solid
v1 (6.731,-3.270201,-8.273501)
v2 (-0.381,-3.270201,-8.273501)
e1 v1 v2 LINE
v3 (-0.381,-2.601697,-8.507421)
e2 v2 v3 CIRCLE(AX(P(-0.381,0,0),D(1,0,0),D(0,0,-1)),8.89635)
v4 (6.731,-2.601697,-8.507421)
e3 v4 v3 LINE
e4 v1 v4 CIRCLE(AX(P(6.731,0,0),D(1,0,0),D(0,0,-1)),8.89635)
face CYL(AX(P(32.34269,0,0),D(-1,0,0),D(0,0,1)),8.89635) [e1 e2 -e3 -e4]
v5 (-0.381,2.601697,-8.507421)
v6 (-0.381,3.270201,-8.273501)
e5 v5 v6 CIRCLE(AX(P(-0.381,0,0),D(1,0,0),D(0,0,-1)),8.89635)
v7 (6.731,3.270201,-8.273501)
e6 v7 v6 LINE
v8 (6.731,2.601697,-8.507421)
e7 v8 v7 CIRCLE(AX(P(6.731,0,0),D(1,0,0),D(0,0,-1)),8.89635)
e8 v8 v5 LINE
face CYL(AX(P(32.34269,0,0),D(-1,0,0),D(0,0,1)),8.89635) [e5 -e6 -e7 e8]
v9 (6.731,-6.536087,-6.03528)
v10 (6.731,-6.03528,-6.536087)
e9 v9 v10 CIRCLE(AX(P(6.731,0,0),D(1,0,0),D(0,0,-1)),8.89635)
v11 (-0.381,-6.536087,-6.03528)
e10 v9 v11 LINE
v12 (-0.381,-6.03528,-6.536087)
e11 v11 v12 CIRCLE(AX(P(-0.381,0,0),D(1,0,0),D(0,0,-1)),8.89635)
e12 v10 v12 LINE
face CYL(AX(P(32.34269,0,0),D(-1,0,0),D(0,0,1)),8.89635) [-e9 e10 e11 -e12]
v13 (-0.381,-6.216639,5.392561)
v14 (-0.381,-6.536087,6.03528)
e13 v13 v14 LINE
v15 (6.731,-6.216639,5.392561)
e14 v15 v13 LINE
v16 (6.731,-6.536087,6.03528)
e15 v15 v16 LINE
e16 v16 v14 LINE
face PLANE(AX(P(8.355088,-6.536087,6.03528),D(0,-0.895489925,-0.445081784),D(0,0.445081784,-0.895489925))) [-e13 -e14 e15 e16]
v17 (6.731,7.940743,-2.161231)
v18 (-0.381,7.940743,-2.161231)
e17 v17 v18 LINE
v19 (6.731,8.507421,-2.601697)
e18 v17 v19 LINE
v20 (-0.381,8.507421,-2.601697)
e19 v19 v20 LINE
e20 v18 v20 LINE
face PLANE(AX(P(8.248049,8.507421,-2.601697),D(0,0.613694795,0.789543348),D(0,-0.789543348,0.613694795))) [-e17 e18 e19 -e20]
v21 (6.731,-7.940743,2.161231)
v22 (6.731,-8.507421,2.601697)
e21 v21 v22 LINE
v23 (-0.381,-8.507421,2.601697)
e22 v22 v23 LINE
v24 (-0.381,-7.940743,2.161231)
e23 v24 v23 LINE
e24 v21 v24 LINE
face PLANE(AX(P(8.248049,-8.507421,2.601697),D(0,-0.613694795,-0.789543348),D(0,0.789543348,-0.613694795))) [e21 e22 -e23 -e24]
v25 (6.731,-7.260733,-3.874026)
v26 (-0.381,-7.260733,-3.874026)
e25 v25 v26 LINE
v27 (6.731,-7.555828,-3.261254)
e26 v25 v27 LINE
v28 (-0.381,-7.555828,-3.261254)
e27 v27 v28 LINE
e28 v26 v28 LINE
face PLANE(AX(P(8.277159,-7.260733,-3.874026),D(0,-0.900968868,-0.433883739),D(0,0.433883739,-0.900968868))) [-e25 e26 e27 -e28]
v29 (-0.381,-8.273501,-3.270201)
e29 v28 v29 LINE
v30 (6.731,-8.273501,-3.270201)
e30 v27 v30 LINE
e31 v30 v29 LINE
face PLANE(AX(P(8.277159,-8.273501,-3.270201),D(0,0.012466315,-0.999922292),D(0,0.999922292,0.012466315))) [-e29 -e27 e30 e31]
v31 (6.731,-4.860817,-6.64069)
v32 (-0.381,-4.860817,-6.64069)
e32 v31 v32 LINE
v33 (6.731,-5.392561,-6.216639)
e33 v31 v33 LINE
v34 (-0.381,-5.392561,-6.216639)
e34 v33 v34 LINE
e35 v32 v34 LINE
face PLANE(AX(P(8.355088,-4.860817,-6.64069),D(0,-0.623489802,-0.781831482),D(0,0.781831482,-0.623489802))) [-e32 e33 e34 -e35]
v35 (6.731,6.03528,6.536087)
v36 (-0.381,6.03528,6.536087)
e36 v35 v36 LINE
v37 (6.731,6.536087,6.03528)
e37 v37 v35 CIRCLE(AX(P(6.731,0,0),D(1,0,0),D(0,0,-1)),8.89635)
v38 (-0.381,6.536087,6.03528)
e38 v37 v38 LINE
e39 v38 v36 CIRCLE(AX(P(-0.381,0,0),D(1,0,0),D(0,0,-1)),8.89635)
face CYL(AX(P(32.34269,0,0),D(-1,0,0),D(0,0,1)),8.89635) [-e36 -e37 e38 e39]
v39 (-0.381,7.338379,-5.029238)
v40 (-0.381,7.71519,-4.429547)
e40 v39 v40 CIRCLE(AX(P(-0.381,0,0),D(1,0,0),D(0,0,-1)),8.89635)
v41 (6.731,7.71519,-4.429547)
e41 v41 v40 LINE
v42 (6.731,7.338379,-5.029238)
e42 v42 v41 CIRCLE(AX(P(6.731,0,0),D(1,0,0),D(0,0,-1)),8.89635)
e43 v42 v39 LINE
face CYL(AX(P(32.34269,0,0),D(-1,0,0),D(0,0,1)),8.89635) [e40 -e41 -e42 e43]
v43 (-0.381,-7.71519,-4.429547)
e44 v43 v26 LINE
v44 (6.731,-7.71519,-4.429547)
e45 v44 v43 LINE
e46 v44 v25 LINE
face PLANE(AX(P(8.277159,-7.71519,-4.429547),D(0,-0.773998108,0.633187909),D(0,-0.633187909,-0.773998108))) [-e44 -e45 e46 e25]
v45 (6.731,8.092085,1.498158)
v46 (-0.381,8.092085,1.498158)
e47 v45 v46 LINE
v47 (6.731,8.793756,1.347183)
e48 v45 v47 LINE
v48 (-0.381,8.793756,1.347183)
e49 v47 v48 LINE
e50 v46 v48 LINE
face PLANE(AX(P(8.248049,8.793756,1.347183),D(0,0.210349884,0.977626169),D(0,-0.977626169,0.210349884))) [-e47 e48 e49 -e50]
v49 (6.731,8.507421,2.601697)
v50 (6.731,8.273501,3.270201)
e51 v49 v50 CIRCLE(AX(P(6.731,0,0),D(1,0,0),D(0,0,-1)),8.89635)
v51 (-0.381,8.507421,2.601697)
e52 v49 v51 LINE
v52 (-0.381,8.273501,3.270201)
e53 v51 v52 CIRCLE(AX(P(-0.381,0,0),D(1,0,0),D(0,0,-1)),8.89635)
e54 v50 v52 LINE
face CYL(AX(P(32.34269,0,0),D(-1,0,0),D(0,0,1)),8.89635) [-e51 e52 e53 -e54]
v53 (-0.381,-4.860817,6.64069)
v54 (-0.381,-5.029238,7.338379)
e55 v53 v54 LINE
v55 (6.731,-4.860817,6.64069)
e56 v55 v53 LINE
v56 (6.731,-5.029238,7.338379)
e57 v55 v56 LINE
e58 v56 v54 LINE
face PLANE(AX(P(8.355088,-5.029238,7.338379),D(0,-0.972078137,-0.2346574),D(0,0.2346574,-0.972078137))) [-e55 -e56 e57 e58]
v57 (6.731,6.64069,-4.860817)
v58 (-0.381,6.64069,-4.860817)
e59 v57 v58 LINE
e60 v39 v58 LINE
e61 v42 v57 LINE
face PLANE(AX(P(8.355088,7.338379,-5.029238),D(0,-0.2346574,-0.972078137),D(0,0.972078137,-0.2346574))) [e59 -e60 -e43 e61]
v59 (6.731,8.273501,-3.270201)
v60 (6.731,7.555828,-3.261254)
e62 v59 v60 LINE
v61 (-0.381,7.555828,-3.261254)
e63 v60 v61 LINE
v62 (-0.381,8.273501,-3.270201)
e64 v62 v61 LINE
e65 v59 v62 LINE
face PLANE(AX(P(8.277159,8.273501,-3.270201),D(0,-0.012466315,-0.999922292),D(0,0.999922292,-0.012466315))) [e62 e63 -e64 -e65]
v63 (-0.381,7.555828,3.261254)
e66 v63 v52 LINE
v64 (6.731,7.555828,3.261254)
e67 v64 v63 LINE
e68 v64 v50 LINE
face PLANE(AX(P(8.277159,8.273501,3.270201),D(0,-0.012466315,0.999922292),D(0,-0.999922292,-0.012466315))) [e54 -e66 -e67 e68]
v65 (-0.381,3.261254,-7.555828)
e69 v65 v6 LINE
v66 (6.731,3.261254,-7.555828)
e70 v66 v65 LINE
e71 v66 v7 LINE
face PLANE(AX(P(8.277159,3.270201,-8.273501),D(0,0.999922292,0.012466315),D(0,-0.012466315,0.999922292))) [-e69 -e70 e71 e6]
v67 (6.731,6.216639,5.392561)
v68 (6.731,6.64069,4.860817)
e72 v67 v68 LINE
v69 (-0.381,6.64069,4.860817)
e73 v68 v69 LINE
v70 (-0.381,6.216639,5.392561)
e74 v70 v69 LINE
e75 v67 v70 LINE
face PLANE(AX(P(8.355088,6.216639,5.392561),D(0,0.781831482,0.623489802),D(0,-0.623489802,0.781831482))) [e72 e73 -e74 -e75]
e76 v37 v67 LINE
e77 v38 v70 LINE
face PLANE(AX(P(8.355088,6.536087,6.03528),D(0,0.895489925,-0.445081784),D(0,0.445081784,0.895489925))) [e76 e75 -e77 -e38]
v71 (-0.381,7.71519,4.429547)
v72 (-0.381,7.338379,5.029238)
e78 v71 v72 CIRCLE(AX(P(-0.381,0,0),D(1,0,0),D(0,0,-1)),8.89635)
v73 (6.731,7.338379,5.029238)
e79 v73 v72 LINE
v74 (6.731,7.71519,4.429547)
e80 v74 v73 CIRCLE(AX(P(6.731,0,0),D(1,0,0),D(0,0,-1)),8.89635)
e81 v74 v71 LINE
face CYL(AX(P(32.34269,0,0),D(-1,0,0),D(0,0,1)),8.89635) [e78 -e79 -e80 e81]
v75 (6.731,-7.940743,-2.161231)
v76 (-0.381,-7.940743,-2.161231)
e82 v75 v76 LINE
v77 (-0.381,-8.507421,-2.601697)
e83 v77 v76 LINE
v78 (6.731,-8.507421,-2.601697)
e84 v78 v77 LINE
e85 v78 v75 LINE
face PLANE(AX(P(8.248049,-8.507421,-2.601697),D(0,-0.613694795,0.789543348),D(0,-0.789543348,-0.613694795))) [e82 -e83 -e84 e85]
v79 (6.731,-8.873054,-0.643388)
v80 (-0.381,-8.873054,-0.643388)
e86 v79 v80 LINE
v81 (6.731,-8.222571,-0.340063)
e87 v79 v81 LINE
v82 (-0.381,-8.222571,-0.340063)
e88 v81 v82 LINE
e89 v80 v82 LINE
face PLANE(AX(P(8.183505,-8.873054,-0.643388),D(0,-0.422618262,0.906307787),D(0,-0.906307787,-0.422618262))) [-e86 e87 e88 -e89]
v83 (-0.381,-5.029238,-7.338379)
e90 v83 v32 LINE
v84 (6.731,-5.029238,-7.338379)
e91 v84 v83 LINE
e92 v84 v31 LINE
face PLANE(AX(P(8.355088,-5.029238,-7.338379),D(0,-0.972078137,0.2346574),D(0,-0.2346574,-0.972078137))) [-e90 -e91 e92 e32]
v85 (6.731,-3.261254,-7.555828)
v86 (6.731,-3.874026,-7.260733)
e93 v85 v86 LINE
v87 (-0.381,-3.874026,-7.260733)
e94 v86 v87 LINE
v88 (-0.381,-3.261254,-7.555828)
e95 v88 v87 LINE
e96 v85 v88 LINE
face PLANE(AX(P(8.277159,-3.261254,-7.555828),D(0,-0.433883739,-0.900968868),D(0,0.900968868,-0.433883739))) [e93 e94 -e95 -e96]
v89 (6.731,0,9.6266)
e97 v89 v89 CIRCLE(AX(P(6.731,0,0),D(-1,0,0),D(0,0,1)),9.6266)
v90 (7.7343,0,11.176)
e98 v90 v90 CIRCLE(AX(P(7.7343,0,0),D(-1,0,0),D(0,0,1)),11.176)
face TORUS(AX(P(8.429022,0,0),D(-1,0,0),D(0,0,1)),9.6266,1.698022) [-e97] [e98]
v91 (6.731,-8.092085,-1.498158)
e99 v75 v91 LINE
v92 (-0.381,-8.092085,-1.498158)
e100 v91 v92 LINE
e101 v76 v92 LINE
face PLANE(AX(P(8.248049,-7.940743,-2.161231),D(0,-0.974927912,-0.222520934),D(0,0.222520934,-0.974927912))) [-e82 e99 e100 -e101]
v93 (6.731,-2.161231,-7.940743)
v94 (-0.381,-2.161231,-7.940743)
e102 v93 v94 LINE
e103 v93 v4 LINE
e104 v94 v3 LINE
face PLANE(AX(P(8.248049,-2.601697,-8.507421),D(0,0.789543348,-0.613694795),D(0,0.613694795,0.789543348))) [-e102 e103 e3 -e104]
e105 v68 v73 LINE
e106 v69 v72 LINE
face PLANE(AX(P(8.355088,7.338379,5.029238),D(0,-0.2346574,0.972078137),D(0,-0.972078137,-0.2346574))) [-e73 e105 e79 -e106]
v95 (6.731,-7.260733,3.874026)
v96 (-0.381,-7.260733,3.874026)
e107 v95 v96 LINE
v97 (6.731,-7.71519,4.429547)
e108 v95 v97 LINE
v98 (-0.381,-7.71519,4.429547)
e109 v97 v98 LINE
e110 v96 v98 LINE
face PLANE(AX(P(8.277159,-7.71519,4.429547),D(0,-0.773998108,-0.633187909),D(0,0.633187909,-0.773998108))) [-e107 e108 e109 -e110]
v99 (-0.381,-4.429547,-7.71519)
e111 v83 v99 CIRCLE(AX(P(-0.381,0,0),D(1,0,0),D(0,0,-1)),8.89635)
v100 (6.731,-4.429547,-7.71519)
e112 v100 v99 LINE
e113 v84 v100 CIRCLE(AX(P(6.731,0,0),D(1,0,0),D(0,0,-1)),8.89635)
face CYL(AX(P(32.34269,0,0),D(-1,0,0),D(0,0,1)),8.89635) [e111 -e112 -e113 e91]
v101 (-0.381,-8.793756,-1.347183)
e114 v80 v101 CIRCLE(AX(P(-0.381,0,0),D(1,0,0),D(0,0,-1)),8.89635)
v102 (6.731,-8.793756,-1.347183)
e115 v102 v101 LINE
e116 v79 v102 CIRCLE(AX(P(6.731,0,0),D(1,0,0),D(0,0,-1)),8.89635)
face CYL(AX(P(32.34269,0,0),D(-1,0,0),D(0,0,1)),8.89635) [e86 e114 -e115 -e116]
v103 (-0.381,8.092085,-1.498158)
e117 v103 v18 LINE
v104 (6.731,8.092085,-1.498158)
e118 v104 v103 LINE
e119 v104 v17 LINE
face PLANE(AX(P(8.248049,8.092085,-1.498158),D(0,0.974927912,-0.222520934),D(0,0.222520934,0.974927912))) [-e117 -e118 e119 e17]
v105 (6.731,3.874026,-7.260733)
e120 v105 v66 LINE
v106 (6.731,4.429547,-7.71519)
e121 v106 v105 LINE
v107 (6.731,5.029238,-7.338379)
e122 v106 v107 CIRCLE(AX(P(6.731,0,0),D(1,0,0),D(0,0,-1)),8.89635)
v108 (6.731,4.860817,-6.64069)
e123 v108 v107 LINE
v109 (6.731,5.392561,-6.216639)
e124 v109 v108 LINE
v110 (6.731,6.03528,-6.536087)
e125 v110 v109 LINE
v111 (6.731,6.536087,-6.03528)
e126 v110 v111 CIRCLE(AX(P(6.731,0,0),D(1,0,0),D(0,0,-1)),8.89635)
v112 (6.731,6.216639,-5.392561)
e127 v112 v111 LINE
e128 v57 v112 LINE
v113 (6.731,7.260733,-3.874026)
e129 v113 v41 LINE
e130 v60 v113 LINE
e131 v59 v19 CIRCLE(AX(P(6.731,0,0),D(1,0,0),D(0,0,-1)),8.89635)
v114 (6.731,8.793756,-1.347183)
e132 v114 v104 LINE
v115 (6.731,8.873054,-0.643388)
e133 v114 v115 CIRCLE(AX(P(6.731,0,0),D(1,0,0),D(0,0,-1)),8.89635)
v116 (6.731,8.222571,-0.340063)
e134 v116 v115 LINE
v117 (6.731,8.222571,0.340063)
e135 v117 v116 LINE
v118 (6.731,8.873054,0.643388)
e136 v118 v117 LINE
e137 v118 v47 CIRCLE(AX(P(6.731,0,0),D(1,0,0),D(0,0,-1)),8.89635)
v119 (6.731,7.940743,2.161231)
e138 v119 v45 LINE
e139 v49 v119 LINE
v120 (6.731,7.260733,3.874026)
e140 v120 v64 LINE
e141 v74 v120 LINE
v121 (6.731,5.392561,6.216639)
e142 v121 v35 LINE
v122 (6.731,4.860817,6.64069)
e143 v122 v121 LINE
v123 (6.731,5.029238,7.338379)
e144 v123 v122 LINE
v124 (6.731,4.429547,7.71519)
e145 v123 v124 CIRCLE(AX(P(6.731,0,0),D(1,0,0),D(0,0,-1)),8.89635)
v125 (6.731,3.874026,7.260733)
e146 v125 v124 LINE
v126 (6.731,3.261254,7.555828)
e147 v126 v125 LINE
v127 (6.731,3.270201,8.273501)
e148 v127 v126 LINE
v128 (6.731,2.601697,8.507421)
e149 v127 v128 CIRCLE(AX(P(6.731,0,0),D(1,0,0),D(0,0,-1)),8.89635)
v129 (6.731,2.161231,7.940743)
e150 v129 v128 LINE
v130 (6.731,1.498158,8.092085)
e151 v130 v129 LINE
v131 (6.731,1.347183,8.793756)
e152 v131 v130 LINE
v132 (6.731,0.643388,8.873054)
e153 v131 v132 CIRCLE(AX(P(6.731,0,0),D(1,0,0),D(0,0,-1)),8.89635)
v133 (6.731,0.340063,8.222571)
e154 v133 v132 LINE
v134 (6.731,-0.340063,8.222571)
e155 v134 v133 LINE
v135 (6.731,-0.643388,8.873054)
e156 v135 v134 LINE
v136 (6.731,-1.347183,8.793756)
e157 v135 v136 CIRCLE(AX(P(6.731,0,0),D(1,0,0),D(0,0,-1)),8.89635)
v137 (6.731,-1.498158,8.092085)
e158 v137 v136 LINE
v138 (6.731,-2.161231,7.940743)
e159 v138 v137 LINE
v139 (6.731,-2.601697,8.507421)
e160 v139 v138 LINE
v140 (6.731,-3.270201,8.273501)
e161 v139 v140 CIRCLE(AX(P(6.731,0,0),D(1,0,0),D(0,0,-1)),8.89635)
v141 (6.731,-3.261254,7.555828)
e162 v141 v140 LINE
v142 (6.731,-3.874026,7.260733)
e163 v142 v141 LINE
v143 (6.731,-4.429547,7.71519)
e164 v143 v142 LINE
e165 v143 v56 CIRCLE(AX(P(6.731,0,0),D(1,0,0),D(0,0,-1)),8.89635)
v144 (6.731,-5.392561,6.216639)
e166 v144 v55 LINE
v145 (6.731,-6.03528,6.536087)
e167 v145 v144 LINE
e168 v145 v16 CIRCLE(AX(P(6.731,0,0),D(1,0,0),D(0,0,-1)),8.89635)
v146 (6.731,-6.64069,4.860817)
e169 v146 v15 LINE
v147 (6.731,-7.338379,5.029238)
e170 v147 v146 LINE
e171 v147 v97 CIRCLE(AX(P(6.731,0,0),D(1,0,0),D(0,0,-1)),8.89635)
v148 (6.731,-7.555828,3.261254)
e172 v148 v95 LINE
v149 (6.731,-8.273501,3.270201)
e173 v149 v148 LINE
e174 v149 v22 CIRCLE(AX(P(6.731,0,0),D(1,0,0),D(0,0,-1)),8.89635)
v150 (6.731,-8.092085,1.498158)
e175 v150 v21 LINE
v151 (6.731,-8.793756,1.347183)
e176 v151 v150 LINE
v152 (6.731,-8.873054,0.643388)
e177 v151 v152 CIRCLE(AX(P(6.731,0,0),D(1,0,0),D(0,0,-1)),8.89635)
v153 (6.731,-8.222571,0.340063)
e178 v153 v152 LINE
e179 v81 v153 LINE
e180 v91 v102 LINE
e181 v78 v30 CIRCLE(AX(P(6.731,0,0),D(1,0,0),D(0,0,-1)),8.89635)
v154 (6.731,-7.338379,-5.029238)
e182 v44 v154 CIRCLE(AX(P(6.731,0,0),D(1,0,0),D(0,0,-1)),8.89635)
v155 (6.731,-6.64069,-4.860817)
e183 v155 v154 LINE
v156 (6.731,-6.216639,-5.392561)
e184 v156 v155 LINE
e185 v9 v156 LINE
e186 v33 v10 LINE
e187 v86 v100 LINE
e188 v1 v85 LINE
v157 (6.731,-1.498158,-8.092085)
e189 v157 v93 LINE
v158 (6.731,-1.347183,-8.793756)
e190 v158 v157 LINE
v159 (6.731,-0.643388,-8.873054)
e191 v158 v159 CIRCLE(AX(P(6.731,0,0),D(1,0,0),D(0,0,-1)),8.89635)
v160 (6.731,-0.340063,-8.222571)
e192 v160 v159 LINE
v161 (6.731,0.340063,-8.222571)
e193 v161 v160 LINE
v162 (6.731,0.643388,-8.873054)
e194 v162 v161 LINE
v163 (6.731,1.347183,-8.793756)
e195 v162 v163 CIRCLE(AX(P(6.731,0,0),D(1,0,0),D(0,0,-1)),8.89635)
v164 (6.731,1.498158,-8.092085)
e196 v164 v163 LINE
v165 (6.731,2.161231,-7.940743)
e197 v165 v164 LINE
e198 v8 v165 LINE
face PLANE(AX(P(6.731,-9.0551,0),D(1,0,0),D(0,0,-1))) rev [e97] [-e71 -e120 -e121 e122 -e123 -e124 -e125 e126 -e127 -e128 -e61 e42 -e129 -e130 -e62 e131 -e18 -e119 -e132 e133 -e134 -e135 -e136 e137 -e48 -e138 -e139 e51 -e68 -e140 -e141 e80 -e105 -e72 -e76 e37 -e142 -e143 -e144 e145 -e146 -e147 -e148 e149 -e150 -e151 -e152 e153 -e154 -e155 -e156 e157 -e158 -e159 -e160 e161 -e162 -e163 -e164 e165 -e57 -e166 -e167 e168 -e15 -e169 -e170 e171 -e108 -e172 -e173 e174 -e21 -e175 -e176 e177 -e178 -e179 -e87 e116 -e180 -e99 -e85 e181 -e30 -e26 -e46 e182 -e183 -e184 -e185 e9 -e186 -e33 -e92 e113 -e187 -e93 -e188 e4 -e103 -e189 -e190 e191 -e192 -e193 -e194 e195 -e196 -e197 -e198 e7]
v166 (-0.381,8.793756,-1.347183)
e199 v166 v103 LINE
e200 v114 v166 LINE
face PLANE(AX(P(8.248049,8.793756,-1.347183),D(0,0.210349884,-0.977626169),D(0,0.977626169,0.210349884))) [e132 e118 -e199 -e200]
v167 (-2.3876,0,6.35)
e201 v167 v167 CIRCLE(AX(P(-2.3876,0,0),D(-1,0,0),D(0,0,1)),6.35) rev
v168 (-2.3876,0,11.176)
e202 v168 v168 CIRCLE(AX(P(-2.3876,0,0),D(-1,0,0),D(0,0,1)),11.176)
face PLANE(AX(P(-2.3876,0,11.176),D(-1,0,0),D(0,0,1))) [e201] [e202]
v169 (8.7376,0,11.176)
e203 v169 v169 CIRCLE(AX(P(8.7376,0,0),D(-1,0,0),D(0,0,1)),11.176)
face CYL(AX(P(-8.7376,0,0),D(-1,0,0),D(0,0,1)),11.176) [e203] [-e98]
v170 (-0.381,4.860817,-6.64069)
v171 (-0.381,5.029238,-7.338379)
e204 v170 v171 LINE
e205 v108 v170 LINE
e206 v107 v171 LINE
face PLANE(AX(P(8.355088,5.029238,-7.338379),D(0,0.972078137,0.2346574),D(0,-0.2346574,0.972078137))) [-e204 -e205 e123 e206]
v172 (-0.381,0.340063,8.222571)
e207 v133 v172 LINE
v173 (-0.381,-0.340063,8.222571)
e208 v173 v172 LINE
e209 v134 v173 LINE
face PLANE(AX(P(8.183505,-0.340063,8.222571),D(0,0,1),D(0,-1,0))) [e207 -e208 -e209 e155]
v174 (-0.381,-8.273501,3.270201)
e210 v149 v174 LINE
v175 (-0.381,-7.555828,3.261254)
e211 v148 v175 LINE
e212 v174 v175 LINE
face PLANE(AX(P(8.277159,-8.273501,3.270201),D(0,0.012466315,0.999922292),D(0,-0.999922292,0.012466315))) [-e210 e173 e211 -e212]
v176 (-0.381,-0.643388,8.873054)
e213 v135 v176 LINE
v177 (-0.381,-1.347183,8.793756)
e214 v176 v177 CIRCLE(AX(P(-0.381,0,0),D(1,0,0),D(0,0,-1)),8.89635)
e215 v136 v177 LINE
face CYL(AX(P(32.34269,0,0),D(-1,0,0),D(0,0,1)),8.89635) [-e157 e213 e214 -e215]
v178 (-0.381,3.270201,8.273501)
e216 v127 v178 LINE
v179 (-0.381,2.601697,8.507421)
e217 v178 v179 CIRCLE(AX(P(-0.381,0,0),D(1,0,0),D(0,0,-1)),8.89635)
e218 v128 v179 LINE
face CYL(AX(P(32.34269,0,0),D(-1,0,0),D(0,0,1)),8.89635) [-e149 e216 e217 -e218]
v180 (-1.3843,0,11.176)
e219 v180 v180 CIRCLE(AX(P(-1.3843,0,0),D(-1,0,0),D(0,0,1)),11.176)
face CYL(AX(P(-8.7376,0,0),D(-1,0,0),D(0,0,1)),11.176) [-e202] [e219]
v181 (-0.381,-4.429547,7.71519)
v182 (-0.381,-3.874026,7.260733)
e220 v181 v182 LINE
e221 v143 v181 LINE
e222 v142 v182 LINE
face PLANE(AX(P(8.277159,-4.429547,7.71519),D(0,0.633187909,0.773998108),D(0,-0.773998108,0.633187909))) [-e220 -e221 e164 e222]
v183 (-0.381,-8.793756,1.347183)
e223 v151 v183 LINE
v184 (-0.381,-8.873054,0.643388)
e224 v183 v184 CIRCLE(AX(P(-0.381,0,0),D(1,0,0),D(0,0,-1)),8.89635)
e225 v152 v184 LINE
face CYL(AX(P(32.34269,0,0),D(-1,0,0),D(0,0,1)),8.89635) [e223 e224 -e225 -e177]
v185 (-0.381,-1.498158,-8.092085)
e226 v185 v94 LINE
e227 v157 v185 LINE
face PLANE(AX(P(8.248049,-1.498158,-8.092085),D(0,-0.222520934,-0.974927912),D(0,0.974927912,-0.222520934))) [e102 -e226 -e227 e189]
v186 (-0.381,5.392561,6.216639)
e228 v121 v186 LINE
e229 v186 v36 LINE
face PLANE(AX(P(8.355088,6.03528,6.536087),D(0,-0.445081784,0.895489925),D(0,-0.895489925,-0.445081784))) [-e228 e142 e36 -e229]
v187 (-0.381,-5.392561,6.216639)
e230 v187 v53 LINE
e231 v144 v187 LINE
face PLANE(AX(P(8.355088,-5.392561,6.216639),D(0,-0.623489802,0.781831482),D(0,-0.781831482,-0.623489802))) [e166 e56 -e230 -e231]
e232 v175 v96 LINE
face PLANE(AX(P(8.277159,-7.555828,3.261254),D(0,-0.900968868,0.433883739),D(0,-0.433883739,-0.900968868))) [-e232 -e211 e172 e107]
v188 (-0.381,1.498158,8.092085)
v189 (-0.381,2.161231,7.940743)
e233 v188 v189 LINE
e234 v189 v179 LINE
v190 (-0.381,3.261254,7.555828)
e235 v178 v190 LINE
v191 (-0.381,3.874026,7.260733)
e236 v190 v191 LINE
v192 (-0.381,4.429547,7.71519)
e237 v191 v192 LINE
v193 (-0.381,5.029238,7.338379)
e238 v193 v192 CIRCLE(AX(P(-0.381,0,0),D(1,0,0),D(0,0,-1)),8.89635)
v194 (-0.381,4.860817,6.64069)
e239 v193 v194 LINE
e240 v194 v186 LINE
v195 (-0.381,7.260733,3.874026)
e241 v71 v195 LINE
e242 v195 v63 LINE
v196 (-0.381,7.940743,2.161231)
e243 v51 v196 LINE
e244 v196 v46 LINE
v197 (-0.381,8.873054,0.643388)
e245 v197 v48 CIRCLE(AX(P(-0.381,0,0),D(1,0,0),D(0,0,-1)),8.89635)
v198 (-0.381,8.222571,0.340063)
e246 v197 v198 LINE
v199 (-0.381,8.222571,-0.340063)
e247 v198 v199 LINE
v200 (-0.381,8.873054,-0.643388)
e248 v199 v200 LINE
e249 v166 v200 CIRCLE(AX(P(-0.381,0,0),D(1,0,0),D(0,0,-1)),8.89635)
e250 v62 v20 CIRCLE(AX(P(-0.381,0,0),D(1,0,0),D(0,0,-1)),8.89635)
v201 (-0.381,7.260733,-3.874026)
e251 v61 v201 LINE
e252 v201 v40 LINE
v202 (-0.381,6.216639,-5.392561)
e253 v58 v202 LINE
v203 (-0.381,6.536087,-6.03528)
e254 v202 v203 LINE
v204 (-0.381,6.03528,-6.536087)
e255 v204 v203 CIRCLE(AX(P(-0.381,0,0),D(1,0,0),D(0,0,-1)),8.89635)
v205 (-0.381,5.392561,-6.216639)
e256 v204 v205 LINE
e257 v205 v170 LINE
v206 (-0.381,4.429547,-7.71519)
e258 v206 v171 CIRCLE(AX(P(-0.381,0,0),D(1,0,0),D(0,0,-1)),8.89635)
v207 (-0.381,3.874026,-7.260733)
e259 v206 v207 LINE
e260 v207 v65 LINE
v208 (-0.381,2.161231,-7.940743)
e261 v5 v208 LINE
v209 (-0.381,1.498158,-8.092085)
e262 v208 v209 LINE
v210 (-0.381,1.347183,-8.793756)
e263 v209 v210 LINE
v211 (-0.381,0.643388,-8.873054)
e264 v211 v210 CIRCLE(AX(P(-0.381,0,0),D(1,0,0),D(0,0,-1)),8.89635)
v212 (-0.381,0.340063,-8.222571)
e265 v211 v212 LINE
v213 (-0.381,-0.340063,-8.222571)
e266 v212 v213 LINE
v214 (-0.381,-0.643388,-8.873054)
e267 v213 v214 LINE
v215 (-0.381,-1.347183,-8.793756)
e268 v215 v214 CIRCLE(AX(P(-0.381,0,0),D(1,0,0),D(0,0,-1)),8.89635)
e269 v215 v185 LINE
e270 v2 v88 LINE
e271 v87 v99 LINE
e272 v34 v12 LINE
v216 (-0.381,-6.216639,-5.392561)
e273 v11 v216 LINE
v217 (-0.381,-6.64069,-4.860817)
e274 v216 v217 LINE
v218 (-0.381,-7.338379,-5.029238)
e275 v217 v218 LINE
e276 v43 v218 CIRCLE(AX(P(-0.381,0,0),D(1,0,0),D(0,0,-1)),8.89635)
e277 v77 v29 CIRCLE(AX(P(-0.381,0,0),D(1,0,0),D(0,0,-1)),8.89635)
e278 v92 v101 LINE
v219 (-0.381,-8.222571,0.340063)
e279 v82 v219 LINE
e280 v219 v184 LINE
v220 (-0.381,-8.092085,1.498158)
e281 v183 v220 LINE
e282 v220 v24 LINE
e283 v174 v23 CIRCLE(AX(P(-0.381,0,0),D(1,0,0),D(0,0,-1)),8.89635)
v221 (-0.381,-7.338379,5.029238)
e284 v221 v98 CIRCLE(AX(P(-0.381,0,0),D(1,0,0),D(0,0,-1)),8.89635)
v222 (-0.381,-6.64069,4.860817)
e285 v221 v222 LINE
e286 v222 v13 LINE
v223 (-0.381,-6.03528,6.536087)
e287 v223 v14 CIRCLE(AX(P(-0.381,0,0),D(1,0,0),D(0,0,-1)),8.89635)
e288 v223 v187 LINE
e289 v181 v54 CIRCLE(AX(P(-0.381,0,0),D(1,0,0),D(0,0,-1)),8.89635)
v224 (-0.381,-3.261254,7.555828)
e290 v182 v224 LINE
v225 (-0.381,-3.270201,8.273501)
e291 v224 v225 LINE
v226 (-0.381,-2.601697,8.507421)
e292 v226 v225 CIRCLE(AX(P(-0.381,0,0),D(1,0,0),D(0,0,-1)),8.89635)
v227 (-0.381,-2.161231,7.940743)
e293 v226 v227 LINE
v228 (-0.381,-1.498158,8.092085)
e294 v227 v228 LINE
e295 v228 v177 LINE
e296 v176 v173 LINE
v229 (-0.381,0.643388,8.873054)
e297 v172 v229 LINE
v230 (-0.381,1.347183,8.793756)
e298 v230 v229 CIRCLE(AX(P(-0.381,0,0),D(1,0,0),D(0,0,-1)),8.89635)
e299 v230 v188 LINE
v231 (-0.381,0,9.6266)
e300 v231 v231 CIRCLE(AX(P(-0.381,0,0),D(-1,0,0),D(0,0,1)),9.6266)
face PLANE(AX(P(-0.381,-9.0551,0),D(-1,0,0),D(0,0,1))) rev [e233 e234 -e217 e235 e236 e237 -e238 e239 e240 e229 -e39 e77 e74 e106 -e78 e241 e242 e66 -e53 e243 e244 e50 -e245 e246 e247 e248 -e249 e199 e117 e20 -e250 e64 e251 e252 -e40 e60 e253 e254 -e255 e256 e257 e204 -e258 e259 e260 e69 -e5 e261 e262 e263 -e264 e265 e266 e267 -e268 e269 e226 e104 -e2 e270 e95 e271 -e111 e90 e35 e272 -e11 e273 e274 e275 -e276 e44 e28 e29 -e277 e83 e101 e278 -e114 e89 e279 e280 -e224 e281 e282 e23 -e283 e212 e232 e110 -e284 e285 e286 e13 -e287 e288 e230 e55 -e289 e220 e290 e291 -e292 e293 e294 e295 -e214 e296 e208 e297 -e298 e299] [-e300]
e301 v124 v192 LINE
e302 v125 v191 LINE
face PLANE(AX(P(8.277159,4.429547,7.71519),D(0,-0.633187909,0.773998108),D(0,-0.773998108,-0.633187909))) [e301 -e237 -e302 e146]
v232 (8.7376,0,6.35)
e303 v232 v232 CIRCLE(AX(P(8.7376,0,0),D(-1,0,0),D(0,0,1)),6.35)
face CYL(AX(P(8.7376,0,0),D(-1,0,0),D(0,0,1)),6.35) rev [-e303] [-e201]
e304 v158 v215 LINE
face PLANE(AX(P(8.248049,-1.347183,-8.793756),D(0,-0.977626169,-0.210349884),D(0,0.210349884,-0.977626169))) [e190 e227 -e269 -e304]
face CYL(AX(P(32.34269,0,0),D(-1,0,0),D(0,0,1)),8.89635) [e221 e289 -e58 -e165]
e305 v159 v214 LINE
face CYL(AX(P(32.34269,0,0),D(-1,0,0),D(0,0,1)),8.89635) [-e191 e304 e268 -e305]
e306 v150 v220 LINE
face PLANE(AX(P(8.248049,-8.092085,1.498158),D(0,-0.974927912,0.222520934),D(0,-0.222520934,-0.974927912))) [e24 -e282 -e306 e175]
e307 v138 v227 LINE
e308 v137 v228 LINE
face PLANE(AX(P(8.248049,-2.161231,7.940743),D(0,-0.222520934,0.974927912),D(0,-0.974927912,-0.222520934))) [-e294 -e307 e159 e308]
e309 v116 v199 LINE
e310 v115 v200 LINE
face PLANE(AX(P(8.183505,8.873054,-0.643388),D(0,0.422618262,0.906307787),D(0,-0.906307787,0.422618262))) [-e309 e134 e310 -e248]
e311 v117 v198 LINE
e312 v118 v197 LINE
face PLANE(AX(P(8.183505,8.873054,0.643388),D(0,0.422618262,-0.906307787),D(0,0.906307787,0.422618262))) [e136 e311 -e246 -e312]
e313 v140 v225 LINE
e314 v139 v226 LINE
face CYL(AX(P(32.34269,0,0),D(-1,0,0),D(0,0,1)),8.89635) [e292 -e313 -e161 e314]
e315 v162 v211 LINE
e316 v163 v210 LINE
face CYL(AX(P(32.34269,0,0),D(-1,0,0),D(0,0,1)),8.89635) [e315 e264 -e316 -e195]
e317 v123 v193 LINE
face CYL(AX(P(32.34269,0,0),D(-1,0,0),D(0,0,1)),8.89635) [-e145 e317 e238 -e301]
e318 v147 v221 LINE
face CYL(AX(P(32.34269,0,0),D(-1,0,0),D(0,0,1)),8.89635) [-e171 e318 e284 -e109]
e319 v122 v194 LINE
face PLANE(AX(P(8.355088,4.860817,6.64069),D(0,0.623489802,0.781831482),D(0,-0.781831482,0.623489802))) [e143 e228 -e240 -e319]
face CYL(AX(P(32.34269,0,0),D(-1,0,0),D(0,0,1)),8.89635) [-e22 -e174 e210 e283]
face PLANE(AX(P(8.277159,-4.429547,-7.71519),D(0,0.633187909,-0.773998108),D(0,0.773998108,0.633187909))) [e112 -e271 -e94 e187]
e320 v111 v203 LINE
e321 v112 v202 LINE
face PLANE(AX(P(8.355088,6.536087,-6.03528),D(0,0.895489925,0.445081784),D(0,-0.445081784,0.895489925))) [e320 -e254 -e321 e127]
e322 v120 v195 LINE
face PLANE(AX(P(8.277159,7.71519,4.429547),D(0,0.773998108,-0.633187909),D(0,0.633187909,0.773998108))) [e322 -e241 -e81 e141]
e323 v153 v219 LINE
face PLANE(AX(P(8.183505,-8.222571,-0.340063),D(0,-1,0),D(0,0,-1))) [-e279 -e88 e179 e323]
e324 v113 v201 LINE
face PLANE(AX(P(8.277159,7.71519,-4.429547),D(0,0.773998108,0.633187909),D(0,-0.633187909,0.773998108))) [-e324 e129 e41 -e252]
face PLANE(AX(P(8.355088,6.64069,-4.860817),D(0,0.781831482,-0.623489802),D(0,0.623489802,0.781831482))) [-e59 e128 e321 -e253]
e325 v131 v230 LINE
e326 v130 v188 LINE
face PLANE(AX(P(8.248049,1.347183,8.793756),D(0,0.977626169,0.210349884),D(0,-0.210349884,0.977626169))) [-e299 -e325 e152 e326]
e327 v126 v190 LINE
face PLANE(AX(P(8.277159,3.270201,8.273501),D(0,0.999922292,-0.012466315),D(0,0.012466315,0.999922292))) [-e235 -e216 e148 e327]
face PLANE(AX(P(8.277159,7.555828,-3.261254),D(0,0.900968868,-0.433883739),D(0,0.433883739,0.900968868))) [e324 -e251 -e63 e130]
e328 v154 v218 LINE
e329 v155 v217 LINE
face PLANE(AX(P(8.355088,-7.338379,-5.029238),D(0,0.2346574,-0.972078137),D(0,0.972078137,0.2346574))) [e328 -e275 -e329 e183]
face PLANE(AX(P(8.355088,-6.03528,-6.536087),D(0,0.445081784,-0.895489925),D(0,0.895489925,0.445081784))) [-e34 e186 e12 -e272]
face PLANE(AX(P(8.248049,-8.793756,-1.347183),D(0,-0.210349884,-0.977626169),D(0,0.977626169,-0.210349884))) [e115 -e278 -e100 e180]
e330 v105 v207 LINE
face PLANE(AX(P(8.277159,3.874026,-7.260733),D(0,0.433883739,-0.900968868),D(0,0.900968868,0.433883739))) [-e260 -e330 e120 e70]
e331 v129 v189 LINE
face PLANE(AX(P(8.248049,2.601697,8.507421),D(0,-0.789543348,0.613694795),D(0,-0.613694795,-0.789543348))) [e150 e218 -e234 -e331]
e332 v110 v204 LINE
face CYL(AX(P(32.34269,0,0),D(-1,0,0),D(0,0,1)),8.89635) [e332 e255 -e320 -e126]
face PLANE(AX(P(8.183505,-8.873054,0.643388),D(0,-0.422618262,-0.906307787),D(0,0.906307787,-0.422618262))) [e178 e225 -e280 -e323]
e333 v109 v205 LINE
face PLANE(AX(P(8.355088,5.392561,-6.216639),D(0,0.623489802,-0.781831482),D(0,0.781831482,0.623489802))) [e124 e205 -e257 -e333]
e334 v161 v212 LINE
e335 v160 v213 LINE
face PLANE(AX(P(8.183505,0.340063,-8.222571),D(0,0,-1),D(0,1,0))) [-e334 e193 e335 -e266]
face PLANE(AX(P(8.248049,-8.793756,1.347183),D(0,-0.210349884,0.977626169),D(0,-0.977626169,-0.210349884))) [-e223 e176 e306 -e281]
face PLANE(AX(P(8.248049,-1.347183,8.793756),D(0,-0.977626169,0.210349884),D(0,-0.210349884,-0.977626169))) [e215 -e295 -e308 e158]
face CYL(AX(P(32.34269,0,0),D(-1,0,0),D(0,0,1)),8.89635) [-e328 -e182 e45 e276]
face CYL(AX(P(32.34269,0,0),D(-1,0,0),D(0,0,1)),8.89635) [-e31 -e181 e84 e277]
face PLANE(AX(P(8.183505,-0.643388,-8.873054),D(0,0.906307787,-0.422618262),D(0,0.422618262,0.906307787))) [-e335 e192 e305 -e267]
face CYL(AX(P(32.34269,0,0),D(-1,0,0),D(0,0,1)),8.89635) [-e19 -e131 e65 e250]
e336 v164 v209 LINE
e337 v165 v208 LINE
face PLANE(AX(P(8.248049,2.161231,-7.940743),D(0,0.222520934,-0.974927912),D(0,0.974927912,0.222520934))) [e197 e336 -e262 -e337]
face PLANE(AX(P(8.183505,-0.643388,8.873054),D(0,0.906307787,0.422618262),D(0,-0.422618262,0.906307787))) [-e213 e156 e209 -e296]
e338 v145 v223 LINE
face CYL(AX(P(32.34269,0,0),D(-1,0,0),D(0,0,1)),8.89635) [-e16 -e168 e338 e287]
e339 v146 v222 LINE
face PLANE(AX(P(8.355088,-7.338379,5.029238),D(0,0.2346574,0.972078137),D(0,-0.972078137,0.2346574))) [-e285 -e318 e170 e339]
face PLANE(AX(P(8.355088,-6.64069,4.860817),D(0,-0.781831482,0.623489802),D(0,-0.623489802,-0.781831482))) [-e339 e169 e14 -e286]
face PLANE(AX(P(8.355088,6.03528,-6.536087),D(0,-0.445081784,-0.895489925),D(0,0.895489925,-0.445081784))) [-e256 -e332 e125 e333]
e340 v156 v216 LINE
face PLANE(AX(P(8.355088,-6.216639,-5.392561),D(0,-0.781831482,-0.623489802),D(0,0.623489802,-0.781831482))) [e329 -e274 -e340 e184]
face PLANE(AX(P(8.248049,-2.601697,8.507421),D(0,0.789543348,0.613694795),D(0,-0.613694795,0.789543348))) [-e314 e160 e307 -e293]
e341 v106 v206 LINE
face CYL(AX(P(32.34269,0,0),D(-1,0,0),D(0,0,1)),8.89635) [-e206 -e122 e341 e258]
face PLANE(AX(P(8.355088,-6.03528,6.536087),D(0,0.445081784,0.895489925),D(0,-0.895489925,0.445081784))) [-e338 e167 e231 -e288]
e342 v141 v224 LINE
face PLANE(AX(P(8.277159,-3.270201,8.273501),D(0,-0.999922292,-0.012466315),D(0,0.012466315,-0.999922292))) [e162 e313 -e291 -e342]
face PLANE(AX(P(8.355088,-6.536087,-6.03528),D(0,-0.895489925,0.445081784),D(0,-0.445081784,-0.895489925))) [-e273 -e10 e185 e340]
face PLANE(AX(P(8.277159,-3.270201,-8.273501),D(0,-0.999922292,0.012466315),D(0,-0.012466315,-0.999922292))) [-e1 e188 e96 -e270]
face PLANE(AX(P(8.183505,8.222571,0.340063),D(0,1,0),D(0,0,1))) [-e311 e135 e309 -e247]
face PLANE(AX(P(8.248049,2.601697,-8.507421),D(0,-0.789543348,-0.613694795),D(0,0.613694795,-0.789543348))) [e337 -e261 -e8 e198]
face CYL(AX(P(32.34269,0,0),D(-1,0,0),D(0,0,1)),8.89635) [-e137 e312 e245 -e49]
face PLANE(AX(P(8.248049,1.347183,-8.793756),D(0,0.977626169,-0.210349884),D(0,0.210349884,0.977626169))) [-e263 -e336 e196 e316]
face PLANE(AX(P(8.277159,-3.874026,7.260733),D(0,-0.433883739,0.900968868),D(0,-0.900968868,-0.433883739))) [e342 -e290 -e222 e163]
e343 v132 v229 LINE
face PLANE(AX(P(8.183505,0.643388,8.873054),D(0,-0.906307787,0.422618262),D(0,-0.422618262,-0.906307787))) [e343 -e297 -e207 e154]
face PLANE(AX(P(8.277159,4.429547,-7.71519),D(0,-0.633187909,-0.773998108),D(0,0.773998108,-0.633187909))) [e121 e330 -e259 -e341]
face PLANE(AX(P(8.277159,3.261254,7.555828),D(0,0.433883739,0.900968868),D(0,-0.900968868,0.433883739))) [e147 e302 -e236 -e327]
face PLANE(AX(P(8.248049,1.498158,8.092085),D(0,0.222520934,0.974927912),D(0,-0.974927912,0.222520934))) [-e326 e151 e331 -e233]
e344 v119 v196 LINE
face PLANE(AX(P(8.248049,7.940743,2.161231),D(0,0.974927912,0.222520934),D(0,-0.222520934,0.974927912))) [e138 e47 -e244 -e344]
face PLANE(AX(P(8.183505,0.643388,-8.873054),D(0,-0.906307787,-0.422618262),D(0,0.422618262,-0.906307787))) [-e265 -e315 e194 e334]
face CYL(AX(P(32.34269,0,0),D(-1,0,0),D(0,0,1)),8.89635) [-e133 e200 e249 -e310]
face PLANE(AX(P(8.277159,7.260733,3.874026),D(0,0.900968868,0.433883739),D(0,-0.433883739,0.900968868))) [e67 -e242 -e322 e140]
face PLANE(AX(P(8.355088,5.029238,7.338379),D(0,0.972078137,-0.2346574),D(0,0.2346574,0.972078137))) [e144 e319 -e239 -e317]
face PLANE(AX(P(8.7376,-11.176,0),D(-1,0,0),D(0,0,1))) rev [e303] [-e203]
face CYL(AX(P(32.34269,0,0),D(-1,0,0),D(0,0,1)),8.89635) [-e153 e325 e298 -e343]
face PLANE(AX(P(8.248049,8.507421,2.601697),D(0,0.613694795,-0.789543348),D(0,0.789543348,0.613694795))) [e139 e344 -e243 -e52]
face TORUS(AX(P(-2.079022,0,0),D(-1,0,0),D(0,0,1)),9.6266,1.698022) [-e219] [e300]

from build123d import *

# Parameters (mm, degrees)
SKETCH4_R          = 9.0551
SKETCH4_R_2        = 8.89635
CUT_EXTRUDE2_DEPTH = 7.112
CUT_EXTRUDE1_DEPTH = 7.112
CIRPATTERN1_COUNT  = 28
SKETCH6_R          = 6.35
CUT_EXTRUDE3_DEPTH = 24.562439751
SPLIT1_START       = -8.7376
SPLIT1_OUTLINE_R   = 8.7376
SPLIT1_OUTLINE_R_2 = 6.35
SPLIT1_DEPTH       = 6.35


# Read off the part's stored shape, not the designer's step: Split1
with BuildPart() as part:
    # Sketch1 → Revolve1 (revolve)
    with BuildSketch(Plane.XY, mode=Mode.PRIVATE) as revolve1_sk:
        with BuildLine():
            Line((-8.7376, 3.175), (8.7376, 3.175))
            Line((8.7376, 3.175), (8.7376, 11.176))
            Line((8.7376, 11.176), (7.7343, 11.176))
            ThreePointArc((7.7343, 11.176), (7.003726949, 10.549537058), (6.731, 9.6266))
            Line((6.731, 9.6266), (6.731, 9.0551))
            Line((6.731, 9.0551), (-0.381, 9.0551))
            Line((-0.381, 9.0551), (-0.381, 9.6266))
            ThreePointArc((-0.381, 9.6266), (-0.653726949, 10.549537058), (-1.3843, 11.176))
            Line((-1.3843, 11.176), (-2.3876, 11.176))
            Line((-2.3876, 11.176), (-2.3876, 8.7376))
            Line((-2.3876, 8.7376), (-8.7376, 8.7376))
            Line((-8.7376, 8.7376), (-8.7376, 3.175))
        make_face()
    revolve(revolve1_sk.sketch.rotate(Axis((-8.7376, 0, 0), (1, 0, 0)), 90), axis=Axis((-8.7376, 0, 0), (1, 0, 0)))

    # Sketch4 → Cut-Extrude2 (cut)
    with BuildSketch(Plane(origin=(-0.381, 0, 0), x_dir=(0, 0, -1), z_dir=(1, 0, 0))):
        Circle(SKETCH4_R)
        Circle(SKETCH4_R_2, mode=Mode.SUBTRACT)
    extrude(amount=CUT_EXTRUDE2_DEPTH, mode=Mode.SUBTRACT)

    # Sketch3 → Cut-Extrude1 (cut)
    with BuildSketch(Plane(origin=(-0.381, 0, 0), x_dir=(0, 0, -1), z_dir=(1, 0, 0))):
        with BuildLine():
            Line((-0.643388094, 8.873054439), (-0.340062676, 8.222570981))
            Line((-0.340062676, 8.222570981), (0.340062676, 8.222570981))
            Line((0.340062676, 8.222570981), (0.643388094, 8.873054439))
            ThreePointArc((0.643388094, 8.873054439), (0, 8.89635), (-0.643388094, 8.873054439))
        make_face()
    cut_extrude1 = extrude(amount=CUT_EXTRUDE1_DEPTH, mode=Mode.SUBTRACT)

    # CirPattern1: Cut-Extrude1 ×28 about axis
    cirpattern1_axis = Axis((0, 0, 0), (1, 0, 0))
    for i in range(1, CIRPATTERN1_COUNT):
        add(cut_extrude1.rotate(cirpattern1_axis, i * 360 / CIRPATTERN1_COUNT), mode=Mode.SUBTRACT)

    # Sketch6 → Cut-Extrude3 (cut, through all)
    with BuildSketch(Plane.ZY.offset(8.7376)):
        Circle(SKETCH6_R)
    extrude(amount=-CUT_EXTRUDE3_DEPTH, mode=Mode.SUBTRACT)

    # Split1 outline → Split1 (cut)
    with BuildSketch(Plane.YZ.offset(SPLIT1_START)):
        Circle(SPLIT1_OUTLINE_R)
        Circle(SPLIT1_OUTLINE_R_2, mode=Mode.SUBTRACT)
    extrude(amount=SPLIT1_DEPTH, mode=Mode.SUBTRACT)


solid = part.part
